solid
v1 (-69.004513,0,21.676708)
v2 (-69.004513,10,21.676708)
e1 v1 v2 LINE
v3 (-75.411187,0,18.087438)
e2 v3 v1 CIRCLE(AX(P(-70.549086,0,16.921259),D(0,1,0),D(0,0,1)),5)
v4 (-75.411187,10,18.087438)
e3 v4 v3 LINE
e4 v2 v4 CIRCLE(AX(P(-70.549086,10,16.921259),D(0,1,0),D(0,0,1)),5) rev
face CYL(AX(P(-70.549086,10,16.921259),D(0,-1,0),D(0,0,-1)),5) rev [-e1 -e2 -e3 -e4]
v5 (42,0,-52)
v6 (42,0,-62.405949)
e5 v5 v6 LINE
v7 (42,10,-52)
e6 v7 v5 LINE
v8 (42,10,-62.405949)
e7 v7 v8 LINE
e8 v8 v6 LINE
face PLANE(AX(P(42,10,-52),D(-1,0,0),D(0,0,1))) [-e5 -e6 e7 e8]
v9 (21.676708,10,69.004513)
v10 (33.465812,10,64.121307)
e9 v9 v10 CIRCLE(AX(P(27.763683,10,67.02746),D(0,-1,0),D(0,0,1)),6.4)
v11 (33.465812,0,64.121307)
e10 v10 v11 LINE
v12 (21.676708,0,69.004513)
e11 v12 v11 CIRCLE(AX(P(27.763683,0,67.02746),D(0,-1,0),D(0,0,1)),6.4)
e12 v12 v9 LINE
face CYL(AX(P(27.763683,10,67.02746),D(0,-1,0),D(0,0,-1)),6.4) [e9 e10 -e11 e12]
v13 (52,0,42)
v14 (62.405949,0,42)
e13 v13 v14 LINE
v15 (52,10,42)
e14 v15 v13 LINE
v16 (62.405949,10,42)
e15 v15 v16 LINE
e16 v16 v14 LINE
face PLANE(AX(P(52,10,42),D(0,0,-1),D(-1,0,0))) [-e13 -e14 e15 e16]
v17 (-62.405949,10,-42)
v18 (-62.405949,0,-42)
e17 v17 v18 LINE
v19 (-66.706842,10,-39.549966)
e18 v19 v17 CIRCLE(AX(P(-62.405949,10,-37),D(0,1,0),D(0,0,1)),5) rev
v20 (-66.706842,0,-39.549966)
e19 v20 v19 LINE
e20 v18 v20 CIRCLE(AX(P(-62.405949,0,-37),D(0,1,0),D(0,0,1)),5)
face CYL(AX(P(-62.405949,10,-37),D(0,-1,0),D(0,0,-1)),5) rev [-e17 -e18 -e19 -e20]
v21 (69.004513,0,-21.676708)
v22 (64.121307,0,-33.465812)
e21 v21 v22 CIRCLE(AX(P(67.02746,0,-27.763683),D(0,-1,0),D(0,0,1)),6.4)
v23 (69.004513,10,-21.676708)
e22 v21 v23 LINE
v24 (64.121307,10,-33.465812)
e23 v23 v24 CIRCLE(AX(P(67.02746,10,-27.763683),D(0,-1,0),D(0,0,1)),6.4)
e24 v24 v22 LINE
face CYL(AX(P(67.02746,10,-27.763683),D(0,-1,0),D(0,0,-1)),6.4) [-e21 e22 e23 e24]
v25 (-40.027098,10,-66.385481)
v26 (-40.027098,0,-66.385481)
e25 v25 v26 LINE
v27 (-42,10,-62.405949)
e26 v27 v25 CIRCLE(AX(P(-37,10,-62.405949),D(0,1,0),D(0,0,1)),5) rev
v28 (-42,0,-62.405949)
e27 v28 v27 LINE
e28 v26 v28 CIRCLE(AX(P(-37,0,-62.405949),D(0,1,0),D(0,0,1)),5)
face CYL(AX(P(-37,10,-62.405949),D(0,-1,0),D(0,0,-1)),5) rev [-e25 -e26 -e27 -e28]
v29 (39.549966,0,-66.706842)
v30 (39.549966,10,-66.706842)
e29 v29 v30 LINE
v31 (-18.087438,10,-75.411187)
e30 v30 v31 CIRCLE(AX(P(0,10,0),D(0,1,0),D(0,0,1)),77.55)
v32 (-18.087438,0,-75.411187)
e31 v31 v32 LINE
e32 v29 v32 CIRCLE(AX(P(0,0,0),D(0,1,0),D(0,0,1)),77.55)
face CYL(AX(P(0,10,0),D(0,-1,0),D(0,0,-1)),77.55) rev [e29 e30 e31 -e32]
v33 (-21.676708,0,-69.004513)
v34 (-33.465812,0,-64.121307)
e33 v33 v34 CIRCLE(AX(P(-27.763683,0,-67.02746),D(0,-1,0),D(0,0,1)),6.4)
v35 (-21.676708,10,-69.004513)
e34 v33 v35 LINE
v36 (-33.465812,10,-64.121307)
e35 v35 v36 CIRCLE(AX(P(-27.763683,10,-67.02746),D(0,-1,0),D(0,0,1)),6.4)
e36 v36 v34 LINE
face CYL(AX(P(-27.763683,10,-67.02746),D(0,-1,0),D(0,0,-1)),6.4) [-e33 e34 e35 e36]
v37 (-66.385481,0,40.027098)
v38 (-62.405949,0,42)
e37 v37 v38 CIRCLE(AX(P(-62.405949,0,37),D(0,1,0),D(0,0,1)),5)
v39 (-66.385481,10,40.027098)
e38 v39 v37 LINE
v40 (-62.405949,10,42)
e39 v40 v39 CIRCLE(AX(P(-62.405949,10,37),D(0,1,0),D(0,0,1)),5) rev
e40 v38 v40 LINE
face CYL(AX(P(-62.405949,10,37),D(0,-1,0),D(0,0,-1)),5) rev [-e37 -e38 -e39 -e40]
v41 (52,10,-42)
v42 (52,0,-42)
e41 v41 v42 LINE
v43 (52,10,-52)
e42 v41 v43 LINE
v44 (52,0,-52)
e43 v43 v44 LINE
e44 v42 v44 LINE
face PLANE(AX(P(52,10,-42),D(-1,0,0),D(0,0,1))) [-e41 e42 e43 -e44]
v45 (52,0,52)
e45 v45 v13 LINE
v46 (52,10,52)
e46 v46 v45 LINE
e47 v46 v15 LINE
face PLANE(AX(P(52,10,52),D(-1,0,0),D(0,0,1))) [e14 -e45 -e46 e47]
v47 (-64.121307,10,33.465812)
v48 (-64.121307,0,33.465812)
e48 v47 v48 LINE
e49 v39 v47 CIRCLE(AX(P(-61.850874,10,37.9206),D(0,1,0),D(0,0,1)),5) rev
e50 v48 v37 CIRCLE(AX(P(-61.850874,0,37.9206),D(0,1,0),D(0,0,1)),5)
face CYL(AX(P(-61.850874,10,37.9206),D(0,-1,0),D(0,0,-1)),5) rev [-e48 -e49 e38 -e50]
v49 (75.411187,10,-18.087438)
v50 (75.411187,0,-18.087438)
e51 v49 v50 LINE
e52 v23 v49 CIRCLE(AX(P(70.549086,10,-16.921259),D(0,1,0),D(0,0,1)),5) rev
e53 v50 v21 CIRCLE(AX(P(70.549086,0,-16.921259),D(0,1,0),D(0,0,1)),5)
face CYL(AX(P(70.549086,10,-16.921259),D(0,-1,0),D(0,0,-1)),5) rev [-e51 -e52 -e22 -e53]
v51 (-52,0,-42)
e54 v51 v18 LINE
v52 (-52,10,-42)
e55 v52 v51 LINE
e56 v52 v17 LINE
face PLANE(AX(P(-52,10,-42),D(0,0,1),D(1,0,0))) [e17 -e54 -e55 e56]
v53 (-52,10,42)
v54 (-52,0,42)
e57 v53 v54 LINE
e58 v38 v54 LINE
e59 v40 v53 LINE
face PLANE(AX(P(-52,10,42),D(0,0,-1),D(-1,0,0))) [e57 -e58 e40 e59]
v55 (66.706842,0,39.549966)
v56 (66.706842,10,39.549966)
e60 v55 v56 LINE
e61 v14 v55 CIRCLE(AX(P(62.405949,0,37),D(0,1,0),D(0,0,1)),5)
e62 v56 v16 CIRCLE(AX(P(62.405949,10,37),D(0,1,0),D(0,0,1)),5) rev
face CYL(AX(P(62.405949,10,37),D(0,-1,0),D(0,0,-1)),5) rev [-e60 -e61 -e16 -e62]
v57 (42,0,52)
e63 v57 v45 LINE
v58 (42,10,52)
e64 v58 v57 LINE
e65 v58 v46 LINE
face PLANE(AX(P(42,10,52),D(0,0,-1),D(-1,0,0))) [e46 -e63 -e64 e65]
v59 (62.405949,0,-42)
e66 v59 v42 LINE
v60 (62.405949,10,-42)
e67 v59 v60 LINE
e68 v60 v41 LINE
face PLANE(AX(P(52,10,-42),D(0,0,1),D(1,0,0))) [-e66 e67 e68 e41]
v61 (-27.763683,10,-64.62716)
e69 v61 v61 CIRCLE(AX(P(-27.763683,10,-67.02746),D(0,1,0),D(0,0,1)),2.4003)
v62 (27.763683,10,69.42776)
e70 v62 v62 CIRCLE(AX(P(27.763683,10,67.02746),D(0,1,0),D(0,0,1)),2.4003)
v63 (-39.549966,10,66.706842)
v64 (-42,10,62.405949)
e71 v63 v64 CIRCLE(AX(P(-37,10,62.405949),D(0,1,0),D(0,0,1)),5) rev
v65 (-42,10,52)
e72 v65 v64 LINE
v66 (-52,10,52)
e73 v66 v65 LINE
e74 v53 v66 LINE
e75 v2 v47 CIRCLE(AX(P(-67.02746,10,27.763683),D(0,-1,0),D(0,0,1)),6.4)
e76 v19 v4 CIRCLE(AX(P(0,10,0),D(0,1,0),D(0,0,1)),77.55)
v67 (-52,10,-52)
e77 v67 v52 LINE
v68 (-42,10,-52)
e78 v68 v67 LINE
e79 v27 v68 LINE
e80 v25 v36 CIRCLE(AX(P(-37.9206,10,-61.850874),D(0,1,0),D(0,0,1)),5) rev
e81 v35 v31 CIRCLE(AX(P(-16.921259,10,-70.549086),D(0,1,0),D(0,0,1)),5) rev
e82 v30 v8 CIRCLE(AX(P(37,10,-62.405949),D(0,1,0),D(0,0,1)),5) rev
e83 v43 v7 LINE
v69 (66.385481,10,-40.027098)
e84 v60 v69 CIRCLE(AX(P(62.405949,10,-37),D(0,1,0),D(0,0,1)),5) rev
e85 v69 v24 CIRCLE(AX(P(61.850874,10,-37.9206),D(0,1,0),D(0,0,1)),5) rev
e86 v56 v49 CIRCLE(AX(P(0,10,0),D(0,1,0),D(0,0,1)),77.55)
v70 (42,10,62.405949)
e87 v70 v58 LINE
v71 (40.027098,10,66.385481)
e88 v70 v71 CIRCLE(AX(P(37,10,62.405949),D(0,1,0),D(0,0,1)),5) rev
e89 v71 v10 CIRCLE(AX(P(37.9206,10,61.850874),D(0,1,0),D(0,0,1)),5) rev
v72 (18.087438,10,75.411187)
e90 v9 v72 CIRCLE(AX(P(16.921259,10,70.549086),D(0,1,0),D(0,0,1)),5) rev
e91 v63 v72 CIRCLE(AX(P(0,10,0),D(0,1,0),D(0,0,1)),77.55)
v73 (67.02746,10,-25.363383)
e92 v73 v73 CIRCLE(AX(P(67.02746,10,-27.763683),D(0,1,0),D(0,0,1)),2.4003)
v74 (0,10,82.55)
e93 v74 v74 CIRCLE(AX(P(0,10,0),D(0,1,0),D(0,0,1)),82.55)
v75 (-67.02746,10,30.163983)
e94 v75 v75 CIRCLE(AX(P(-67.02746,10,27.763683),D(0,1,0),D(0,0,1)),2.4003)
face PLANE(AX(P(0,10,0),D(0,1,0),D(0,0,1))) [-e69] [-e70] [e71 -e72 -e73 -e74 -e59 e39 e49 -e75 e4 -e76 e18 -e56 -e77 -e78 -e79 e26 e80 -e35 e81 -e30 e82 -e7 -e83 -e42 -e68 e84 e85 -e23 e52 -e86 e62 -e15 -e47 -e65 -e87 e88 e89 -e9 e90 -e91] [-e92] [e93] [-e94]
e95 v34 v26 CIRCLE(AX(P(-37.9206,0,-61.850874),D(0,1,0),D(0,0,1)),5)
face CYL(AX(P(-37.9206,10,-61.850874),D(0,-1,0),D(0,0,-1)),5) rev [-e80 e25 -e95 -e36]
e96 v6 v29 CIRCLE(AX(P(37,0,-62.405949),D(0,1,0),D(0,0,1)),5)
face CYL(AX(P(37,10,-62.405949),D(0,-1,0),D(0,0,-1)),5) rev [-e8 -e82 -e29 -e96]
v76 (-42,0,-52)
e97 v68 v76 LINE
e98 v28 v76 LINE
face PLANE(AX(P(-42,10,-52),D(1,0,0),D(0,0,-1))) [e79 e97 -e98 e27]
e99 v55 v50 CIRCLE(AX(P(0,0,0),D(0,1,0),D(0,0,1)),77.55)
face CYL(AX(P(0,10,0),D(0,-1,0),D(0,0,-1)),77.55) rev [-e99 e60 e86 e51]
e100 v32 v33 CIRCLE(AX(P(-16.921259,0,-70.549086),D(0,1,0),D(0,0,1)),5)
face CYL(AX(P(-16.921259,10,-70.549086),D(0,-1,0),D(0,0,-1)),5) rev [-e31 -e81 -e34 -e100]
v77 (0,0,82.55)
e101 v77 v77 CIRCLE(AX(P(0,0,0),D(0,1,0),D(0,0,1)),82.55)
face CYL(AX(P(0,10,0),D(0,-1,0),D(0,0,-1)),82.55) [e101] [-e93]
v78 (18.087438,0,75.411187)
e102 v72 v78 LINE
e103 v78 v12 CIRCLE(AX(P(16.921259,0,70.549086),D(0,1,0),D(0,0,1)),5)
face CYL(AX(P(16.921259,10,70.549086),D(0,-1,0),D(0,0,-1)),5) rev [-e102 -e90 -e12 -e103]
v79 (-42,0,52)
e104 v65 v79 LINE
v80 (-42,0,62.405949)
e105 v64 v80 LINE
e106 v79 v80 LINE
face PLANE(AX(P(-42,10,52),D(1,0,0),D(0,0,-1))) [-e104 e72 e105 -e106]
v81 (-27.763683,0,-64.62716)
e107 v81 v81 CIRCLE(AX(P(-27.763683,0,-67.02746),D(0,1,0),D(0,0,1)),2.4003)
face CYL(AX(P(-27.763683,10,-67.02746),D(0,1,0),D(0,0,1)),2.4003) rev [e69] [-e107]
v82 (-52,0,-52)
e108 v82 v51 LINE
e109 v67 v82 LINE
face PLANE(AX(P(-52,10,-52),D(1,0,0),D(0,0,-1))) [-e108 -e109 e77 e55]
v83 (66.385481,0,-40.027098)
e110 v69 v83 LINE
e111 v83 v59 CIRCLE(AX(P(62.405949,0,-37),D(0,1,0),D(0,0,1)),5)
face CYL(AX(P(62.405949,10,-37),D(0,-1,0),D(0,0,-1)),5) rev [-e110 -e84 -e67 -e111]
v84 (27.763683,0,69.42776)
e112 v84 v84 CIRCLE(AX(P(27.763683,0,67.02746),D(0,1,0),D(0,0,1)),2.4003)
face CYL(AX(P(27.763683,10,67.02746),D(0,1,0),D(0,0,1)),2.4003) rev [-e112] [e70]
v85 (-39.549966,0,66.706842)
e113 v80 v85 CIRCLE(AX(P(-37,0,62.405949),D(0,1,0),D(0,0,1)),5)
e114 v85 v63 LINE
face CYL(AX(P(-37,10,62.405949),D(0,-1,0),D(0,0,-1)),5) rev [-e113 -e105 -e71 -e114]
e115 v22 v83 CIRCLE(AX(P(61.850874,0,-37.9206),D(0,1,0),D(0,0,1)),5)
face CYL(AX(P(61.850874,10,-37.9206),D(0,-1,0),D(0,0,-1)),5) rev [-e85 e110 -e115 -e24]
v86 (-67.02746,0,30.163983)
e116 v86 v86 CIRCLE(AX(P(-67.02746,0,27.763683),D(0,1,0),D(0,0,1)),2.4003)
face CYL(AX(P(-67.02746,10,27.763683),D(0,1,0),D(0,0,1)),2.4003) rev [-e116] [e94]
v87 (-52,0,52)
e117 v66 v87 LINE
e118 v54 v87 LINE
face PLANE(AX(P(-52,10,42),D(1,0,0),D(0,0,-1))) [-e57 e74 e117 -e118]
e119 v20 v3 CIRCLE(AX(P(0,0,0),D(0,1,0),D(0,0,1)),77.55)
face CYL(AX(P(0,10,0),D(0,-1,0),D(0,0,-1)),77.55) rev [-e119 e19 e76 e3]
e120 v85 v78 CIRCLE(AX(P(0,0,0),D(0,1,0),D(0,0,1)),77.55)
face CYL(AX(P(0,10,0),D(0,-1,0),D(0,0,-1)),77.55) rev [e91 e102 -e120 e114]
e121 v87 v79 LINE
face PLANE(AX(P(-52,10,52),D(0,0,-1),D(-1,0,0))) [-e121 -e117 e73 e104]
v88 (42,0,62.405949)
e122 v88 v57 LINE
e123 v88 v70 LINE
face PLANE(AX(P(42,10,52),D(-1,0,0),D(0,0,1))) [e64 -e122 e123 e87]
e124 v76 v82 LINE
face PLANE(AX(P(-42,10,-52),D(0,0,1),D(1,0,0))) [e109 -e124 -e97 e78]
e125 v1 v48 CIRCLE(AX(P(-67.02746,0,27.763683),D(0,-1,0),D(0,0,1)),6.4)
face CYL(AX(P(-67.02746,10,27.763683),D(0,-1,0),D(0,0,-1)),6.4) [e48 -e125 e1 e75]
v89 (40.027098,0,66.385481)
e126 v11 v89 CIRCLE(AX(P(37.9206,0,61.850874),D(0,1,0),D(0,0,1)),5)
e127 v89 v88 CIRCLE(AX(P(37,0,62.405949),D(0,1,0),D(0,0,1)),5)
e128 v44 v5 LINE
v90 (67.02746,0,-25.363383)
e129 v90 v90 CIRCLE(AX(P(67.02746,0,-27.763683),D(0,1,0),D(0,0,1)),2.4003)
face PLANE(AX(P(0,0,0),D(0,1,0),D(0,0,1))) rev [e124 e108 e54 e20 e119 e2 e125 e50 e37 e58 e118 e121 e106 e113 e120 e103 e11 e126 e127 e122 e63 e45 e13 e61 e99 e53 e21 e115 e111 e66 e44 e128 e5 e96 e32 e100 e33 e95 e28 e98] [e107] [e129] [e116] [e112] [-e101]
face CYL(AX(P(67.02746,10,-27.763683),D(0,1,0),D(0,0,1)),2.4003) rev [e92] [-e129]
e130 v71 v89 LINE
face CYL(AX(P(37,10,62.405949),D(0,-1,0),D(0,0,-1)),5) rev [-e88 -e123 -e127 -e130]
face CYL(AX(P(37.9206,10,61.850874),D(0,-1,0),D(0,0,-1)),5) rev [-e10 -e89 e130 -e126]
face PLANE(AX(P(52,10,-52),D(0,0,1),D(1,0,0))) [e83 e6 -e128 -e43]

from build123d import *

# Parameters (mm, degrees)
SKETCH1_R                   = 82.55
BOSS_EXTRUDE1_DEPTH         = 10
FILLET1_R                   = 5
F_12_0_189_DIAMETER_HOLE1_D = 4.8006
CIRPATTERN1_COUNT           = 4


with BuildPart() as part:
    # Sketch1 → Boss-Extrude1 (new body)
    with BuildSketch(Plane(origin=(0, 0, 0), x_dir=(1, 0, 0), z_dir=(0, 1, 0))):
        with Locations(Location((0, 0, 0), (0, 0, 270))):
            Circle(SKETCH1_R)
        with BuildLine():
            Line((-42, 52), (-52, 52))
            Line((-52, 52), (-52, 42))
            Line((-52, 42), (-65.192043226, 42))
            ThreePointArc((-65.192043226, 42), (-74.396389201, 21.890175283), (-77.55, 0))
            ThreePointArc((-77.55, 0), (-76.61982896, -11.975153869), (-73.851629653, -23.663036524))
            Line((-73.851629653, -23.663036524), (-69.476634051, -21.85085401))
            ThreePointArc((-69.476634051, -21.85085401), (-61.114631076, -25.314509051), (-64.578286117, -33.676512026))
            Line((-64.578286117, -33.676512026), (-68.953281719, -35.48869454))
            ThreePointArc((-68.953281719, -35.48869454), (-67.151629361, -38.789962286), (-65.192043226, -42))
            Line((-65.192043226, -42), (-52, -42))
            Line((-52, -42), (-52, -52))
            Line((-52, -52), (-42, -52))
            Line((-42, -52), (-42, -65.192043226))
            ThreePointArc((-42, -65.192043226), (-21.890175283, -74.396389201), (0, -77.55))
            ThreePointArc((0, -77.55), (11.975153869, -76.61982896), (23.663036524, -73.851629653))
            Line((23.663036524, -73.851629653), (21.85085401, -69.476634051))
            ThreePointArc((21.85085401, -69.476634051), (25.314509051, -61.114631076), (33.676512026, -64.578286117))
            Line((33.676512026, -64.578286117), (35.48869454, -68.953281719))
            ThreePointArc((35.48869454, -68.953281719), (38.789962286, -67.151629361), (42, -65.192043226))
            Line((42, -65.192043226), (42, -52))
            Line((42, -52), (52, -52))
            Line((52, -52), (52, -42))
            Line((52, -42), (65.192043226, -42))
            ThreePointArc((65.192043226, -42), (74.396389201, -21.890175283), (77.55, 0))
            ThreePointArc((77.55, 0), (76.61982896, 11.975153869), (73.851629653, 23.663036524))
            Line((73.851629653, 23.663036524), (69.476634051, 21.85085401))
            ThreePointArc((69.476634051, 21.85085401), (61.114631076, 25.314509051), (64.578286117, 33.676512026))
            Line((64.578286117, 33.676512026), (68.953281719, 35.48869454))
            ThreePointArc((68.953281719, 35.48869454), (67.151629361, 38.789962286), (65.192043226, 42))
            Line((65.192043226, 42), (52, 42))
            Line((52, 42), (52, 52))
            Line((52, 52), (42, 52))
            Line((42, 52), (42, 65.192043226))
            ThreePointArc((42, 65.192043226), (21.890175283, 74.396389201), (0, 77.55))
            ThreePointArc((0, 77.55), (-11.975153869, 76.61982896), (-23.663036524, 73.851629653))
            Line((-23.663036524, 73.851629653), (-21.85085401, 69.476634051))
            ThreePointArc((-21.85085401, 69.476634051), (-25.314509051, 61.114631076), (-33.676512026, 64.578286117))
            Line((-33.676512026, 64.578286117), (-35.48869454, 68.953281719))
            ThreePointArc((-35.48869454, 68.953281719), (-38.789962286, 67.151629361), (-42, 65.192043226))
            Line((-42, 65.192043226), (-42, 52))
        make_face(mode=Mode.SUBTRACT)
    extrude(amount=BOSS_EXTRUDE1_DEPTH)

    # Fillet1
    # the kernel refuses this fillet: 5 mm, written as the material it adds along each edge
    with BuildSketch(Plane(origin=(-73.851629653, 0, 23.663036524), x_dir=(-0.269371971456704, 0, -0.9630362095962584), z_dir=(0, 1, 0)), Plane(origin=(23.663036524, 0, 73.851629653), x_dir=(-0.9630362095962577, 0, 0.26937197145670677), z_dir=(0, 1, 0)), Plane(origin=(73.851629653, 0, -23.663036524), x_dir=(0.269371971456704, 0, 0.9630362095962584), z_dir=(0, 1, 0)), Plane(origin=(-23.663036524, 0, -73.851629653), x_dir=(0.9630362095962544, 0, -0.26937197145671865), z_dir=(0, 1, 0))) as fillet1_piece_1:
        with BuildLine():
            CenterArc((5.602962852, -4.996515299), FILLET1_R, 87.860754673, 94.506173203)
            Line((0.607228677, -5.203009978), (0.107655259, -5.223659445))
            ThreePointArc((0.107655259, -5.223659445), (0.070289372, -4.761265734), (-0.496406817, -0.059835376))
            Line((-0.496406817, -0.059835376), (-0.0186641, 0.49965153))
            ThreePointArc((-0.0186641, 0.49965153), (2.894801927, 0.554047707), (5.808267953, 0.49965153))
            Line((5.808267953, 0.49965153), (5.789603853, 0))
        make_face()
    extrude(amount=10)
    with BuildSketch(Plane(origin=(-68.953281719, 0, 35.48869454), x_dir=(0.9224276908117425, 0, -0.386169852815722), z_dir=(0, 1, 0)), Plane(origin=(35.48869454, 0, 68.953281719), x_dir=(-0.38616985281572375, 0, -0.9224276908117417), z_dir=(0, 1, 0)), Plane(origin=(68.953281719, 0, -35.48869454), x_dir=(-0.9224276908117431, 0, 0.3861698528157207), z_dir=(0, 1, 0)), Plane(origin=(-35.48869454, 0, -68.953281719), x_dir=(0.3861698528157226, 0, 0.9224276908117423), z_dir=(0, 1, 0))) as fillet1_piece_2:
        with BuildLine():
            CenterArc((5.612329068, -4.985992408), FILLET1_R, 94.289787829, 94.506173203)
            Line((0.67113325, -5.75057327), (0.177013669, -5.827031356))
            ThreePointArc((0.177013669, -5.827031356), (-0.214745972, -2.939512072), (-0.498446682, -0.039381534))
            Line((-0.498446682, -0.039381534), (0.001888314, 0.499996434))
            ThreePointArc((0.001888314, 0.499996434), (4.73731566, 0.482112358), (5.200923615, 0.498599241))
            Line((5.200923615, 0.498599241), (5.238324111, 0))
        make_face()
    extrude(amount=10)
    with BuildSketch(Plane(origin=(-42, 0, 65.192043226), x_dir=(0, 0, -1), z_dir=(0, 1, 0)), Plane(origin=(65.192043226, 0, 42), x_dir=(-1, 0, 0), z_dir=(0, 1, 0)), Plane(origin=(42, 0, -65.192043226), x_dir=(0, 0, 1), z_dir=(0, 1, 0)), Plane(origin=(-65.192043226, 0, -42), x_dir=(1, 0, 0), z_dir=(0, 1, 0))) as fillet1_piece_3:
        with BuildLine():
            CenterArc((2.786093991, -5), FILLET1_R, 90, 59.336629316)
            ThreePointArc((-1.514798445, -2.450034459), (-0.768775648, -1.217983455), (0, 0))
            Line((0, 0), (2.786093991, 0))
        make_face()
    extrude(amount=10)
    with BuildSketch(Plane(origin=(-65.192043226, 0, 42), x_dir=(-0.5258802907220335, 0, -0.8505585928259789), z_dir=(0, 1, 0)), Plane(origin=(42, 0, 65.192043226), x_dir=(-0.8505585928259877, 0, 0.5258802907220195), z_dir=(0, 1, 0)), Plane(origin=(65.192043226, 0, -42), x_dir=(0.5258802907220256, 0, 0.8505585928259839), z_dir=(0, 1, 0))) as fillet1_piece_4:
        with BuildLine():
            CenterArc((2.787641046, -4.999137638), FILLET1_R, 88.935847769, 59.336629316)
            Line((-1.465151918, -2.369736184), (0, 0))
            ThreePointArc((0, 0), (1.440250254, 0.01337524), (2.880500508, 0))
        make_face()
    extrude(amount=10)
    with BuildSketch(Plane(origin=(-42, 0, -65.192043226), x_dir=(0, 0, 1), z_dir=(0, 1, 0))) as fillet1_piece_5:
        with BuildLine():
            CenterArc((2.786093991, 5), FILLET1_R, 210.663370684, 59.336629316)
            ThreePointArc((-1.514798445, 2.450034459), (-0.768775648, 1.217983455), (0, 0))
            Line((0, 0), (2.786093991, 0))
        make_face()
    extrude(amount=10)

    # #12 (0.189) Diameter Hole1 (through all)
    with Locations(Plane(origin=(0, 10, 0), x_dir=(1, 0, 0), z_dir=(0, 1, 0))):
        with Locations((67.027460084, 27.763683018)):
            f_12_0_189_diameter_hole1 = Hole(F_12_0_189_DIAMETER_HOLE1_D / 2)

    # CirPattern1: #12 (0.189) Diameter Hole1 ×4 about axis
    cirpattern1_axis = Axis((0, 0, 0), (0, 1, 0))
    for i in range(1, CIRPATTERN1_COUNT):
        add(f_12_0_189_diameter_hole1.rotate(cirpattern1_axis, i * 360 / CIRPATTERN1_COUNT), mode=Mode.SUBTRACT)


solid = part.part
